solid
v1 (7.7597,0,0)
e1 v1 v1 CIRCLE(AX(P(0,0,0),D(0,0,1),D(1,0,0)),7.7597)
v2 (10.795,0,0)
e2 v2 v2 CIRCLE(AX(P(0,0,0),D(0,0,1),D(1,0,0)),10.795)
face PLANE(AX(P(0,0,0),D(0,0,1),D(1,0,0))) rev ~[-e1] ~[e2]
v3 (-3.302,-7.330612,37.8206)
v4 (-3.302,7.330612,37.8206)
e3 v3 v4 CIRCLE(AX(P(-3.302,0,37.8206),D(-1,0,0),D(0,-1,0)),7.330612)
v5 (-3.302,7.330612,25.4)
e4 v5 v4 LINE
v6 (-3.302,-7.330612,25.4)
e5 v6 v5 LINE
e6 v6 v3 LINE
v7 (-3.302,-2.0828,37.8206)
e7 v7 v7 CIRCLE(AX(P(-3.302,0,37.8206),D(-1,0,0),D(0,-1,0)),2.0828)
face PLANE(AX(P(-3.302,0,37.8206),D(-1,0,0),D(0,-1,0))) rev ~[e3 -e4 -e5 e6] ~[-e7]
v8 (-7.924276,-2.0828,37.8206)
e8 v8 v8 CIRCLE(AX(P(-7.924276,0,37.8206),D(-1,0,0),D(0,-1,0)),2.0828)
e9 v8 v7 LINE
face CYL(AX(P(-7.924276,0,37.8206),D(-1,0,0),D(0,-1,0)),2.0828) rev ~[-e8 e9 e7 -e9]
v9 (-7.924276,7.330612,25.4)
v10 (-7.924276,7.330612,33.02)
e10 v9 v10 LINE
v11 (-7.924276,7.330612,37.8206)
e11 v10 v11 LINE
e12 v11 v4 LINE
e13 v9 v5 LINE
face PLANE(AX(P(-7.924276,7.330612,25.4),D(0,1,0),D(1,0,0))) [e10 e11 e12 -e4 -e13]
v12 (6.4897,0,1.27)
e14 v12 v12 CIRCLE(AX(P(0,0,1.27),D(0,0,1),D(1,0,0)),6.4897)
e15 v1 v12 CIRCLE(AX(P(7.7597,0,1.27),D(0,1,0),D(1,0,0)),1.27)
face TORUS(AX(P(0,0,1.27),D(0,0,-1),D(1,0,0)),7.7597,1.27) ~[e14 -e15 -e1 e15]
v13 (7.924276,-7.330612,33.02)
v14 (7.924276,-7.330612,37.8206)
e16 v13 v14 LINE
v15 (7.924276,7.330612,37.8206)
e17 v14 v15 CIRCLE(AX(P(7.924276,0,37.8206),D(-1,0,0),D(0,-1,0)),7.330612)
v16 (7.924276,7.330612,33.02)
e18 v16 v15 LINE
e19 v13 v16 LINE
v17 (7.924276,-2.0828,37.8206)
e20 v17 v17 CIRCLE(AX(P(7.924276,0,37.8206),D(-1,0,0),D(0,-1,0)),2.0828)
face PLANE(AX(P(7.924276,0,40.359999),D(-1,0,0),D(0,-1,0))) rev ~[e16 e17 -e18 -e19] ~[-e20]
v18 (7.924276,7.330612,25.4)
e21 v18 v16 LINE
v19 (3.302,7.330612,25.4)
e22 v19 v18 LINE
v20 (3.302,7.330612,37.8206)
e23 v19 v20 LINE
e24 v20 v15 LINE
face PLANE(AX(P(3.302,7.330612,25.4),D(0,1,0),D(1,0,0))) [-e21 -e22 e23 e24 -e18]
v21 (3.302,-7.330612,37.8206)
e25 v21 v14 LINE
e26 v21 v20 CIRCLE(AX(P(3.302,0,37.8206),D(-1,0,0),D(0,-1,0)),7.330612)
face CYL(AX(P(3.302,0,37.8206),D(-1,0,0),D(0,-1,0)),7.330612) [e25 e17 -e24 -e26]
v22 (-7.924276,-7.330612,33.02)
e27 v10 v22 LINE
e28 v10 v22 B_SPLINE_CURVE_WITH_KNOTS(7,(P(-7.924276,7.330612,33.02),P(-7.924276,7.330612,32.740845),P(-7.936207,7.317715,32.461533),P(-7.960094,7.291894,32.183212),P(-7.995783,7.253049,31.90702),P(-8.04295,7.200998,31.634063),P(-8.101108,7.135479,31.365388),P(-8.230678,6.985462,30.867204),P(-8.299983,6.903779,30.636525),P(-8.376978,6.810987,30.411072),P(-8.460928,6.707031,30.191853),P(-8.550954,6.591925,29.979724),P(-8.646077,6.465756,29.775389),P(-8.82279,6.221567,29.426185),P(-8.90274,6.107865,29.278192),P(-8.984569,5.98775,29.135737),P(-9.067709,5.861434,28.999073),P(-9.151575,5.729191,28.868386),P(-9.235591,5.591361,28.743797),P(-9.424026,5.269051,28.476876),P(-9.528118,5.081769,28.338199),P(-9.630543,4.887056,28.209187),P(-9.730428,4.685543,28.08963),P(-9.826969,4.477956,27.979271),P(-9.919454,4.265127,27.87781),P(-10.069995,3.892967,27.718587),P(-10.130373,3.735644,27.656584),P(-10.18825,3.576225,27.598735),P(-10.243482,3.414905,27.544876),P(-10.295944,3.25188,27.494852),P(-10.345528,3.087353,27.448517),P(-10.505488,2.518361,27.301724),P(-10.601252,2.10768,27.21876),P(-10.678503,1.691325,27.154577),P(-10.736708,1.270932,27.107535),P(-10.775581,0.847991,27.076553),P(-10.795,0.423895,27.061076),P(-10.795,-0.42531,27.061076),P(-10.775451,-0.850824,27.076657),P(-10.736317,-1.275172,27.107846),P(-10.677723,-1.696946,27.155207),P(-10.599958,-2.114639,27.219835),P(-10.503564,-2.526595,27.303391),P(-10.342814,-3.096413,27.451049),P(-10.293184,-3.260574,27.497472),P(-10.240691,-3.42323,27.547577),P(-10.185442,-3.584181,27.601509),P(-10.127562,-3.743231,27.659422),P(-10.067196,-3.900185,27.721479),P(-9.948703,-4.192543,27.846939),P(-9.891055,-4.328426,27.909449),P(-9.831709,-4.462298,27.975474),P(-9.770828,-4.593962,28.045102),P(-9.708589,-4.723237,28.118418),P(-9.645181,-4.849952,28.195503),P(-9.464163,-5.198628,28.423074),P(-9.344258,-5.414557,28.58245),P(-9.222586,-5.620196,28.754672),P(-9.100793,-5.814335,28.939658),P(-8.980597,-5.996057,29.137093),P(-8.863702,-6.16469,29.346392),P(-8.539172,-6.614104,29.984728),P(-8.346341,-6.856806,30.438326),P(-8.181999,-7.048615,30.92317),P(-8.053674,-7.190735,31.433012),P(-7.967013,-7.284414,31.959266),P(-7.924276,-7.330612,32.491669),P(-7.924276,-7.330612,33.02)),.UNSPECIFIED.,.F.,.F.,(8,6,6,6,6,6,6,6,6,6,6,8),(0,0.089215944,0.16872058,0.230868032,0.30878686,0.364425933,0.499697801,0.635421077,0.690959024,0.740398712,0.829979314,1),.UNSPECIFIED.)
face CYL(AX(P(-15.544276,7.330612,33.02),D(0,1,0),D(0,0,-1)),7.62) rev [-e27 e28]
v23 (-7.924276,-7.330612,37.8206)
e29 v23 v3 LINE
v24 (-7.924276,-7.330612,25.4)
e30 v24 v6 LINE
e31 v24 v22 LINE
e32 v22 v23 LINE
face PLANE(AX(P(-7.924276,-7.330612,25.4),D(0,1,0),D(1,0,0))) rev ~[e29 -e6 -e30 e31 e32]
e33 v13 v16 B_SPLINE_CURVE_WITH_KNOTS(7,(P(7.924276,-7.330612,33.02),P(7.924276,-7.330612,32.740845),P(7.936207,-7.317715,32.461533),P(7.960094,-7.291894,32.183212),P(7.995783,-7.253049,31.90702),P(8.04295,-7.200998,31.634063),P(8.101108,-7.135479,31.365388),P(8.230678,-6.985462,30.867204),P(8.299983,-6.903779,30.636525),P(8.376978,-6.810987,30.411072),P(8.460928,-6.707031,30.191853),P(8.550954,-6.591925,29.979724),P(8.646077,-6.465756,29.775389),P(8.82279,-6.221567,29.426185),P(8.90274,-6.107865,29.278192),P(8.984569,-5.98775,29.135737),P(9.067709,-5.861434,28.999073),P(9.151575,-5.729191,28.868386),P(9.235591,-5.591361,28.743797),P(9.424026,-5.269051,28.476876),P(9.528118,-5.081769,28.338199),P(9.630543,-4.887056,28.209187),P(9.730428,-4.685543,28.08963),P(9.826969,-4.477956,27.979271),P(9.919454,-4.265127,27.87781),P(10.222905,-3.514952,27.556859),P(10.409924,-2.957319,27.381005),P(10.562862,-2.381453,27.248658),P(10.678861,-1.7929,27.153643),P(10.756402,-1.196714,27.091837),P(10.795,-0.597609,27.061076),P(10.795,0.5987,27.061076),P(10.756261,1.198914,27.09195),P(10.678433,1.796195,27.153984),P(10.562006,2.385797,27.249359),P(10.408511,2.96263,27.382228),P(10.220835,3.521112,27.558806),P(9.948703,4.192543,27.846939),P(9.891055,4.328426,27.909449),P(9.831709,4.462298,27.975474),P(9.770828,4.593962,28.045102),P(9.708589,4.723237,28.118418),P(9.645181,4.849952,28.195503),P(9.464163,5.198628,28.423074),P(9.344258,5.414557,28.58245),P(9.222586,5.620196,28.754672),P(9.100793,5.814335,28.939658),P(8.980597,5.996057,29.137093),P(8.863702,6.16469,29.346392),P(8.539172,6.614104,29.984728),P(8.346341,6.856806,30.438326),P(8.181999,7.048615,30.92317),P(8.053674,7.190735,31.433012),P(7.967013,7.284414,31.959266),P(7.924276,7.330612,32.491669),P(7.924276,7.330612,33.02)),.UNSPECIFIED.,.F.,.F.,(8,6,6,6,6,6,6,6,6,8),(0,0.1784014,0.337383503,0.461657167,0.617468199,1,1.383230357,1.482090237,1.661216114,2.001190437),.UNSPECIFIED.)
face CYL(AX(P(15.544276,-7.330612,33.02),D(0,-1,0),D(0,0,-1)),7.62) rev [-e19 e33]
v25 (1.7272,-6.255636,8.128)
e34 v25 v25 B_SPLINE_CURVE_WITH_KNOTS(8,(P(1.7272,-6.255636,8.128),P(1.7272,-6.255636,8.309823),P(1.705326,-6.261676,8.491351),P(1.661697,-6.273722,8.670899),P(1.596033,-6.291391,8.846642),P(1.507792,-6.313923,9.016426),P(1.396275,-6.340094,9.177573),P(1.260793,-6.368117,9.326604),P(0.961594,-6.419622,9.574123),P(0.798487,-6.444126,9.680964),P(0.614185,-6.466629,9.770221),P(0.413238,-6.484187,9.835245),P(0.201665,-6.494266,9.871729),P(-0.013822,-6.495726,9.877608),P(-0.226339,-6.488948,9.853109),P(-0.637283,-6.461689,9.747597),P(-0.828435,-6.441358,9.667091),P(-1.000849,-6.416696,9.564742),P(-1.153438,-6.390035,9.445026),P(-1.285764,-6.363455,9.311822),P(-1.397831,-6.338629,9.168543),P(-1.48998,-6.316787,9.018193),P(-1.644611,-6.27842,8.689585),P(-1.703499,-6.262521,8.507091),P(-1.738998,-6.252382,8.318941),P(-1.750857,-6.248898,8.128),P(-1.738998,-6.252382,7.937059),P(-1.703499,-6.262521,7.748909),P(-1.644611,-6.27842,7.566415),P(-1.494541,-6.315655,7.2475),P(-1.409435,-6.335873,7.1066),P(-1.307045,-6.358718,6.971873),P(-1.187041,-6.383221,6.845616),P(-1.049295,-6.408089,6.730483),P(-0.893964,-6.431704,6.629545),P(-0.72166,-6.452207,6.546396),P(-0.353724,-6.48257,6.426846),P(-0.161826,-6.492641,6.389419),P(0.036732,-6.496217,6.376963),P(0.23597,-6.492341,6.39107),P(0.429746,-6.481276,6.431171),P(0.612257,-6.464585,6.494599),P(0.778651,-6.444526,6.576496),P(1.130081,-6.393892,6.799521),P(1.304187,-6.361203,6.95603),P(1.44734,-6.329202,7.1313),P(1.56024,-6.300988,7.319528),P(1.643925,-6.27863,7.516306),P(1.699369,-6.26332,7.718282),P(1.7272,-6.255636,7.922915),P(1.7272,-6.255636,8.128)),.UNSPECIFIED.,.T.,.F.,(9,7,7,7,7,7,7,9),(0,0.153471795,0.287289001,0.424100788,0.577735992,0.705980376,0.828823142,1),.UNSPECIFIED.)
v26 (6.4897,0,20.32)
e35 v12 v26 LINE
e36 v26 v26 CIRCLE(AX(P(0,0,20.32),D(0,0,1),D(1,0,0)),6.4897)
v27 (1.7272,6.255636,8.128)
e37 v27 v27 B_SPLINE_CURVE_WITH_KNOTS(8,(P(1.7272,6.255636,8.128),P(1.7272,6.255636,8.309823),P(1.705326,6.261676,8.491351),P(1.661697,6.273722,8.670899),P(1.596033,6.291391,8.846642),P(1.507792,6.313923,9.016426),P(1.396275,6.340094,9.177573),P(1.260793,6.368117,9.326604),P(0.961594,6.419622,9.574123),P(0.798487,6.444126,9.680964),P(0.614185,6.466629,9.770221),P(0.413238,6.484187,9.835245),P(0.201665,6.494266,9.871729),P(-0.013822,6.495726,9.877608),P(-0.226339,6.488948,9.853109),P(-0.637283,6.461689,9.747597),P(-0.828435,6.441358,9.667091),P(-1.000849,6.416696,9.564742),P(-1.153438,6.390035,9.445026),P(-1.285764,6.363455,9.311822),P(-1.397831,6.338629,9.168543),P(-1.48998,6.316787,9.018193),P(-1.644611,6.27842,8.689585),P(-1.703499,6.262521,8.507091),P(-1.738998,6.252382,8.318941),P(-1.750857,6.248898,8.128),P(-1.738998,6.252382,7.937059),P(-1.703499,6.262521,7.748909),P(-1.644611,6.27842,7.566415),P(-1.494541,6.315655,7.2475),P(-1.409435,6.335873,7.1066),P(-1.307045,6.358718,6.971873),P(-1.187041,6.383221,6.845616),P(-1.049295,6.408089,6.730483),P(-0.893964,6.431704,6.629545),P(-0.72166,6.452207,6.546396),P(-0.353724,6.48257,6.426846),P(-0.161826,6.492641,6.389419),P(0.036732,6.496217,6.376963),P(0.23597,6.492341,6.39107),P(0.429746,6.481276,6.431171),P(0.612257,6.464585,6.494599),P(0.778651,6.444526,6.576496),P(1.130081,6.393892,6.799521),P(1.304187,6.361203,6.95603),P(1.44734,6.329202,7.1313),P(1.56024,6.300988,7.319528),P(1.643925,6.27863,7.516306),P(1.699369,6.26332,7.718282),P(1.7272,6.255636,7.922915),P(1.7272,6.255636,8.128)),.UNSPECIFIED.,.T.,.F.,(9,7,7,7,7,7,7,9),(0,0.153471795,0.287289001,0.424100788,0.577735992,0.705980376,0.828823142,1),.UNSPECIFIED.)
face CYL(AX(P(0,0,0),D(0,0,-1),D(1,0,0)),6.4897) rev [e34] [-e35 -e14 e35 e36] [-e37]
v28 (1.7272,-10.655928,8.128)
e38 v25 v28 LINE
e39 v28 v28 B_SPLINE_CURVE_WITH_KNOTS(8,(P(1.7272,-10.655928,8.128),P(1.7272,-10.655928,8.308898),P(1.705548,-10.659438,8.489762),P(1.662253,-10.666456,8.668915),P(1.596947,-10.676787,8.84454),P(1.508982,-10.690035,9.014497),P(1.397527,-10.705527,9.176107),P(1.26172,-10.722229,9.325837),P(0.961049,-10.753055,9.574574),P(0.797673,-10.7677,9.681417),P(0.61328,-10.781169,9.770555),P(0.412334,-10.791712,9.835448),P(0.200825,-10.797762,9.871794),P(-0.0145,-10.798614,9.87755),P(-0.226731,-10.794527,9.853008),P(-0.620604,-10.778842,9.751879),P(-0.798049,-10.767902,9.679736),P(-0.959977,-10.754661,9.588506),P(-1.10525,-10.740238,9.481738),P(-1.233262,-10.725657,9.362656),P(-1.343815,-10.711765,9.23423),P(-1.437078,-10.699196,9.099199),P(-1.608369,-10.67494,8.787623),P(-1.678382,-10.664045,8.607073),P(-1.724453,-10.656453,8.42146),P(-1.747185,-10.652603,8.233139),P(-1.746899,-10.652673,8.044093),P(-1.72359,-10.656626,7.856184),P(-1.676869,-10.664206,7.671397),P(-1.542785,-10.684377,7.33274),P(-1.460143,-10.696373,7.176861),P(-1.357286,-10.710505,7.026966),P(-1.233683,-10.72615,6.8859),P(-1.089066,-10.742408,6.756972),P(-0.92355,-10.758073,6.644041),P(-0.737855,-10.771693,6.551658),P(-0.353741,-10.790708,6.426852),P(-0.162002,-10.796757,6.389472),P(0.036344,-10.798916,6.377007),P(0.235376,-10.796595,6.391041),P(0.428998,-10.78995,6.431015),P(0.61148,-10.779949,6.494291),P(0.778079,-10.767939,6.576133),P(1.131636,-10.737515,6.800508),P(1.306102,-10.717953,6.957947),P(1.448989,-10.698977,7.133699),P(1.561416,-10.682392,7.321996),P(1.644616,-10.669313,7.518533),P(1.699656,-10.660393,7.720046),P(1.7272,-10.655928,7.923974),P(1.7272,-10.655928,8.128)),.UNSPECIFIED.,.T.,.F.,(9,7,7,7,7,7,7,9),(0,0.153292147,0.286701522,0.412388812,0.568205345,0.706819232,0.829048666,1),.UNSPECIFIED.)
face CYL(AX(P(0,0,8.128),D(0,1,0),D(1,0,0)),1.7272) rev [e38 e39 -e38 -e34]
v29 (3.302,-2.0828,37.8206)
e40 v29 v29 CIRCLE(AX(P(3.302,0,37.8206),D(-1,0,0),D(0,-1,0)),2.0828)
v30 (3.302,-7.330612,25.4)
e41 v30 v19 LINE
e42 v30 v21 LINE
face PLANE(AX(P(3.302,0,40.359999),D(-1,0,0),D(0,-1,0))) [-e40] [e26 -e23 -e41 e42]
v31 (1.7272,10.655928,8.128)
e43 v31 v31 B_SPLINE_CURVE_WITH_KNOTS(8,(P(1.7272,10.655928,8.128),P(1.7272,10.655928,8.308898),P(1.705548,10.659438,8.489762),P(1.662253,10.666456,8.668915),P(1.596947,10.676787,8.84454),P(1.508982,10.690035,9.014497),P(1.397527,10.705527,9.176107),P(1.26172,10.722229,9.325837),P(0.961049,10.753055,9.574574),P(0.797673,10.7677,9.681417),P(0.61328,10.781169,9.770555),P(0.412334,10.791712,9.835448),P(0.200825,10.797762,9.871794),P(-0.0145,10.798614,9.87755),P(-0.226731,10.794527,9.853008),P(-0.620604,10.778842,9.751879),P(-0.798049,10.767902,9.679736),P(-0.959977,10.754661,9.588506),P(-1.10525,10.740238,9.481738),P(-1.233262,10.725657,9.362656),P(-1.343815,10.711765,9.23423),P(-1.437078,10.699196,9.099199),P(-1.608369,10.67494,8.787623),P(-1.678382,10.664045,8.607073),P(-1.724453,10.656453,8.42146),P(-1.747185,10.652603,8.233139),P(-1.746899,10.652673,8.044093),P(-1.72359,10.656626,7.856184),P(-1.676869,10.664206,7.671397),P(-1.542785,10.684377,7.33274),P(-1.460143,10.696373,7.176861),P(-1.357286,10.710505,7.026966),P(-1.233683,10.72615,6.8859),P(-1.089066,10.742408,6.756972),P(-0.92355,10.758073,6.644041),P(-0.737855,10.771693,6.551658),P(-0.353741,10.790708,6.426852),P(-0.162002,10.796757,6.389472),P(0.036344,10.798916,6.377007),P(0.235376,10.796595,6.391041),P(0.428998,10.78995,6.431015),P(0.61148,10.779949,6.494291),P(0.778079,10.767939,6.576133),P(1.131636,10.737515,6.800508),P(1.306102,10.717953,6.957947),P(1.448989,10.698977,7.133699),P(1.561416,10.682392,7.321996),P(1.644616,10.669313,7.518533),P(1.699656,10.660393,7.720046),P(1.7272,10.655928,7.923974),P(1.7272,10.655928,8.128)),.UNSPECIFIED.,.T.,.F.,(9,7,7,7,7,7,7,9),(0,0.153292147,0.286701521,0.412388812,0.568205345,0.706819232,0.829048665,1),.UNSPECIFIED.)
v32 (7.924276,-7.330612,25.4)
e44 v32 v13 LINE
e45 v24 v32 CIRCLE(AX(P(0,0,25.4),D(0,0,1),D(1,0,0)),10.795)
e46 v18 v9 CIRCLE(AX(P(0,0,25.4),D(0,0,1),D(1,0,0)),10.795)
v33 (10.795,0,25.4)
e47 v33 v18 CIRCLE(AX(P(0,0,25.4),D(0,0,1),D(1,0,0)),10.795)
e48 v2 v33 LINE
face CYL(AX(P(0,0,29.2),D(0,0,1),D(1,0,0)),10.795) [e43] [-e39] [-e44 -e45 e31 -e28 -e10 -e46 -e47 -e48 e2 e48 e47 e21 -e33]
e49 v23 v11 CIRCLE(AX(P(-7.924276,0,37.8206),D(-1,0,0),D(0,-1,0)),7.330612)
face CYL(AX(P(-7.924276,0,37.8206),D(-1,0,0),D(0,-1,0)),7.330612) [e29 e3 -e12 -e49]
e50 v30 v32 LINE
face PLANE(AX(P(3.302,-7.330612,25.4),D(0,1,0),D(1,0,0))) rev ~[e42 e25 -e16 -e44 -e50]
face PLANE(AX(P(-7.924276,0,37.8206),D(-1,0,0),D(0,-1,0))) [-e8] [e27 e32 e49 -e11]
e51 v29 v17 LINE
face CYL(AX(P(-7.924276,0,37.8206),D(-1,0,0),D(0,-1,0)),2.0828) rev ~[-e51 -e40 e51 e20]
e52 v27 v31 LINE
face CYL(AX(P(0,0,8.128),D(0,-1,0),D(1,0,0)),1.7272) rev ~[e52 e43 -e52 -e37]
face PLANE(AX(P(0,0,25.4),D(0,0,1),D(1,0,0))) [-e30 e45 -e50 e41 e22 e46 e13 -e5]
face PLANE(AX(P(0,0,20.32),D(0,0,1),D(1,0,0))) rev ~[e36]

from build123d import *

# Parameters (mm, degrees)
F0_R          = 10.795
F0_R_2        = 6.4897
F1_DEPTH      = 20.32
F2_R          = 10.795
F3_DEPTH      = 5.08
F4_W          = 4.6222759372
F4_H          = 14.661224488
F5_DEPTH      = 12.4206
F6_R          = 1.7272
F7_DEPTH      = 10.796
F7_DEPTH_BACK = 25.4
F9_DEPTH      = 4.6222759372
F10_R         = 7.330612244
F11_DEPTH     = 4.6222759372
F12_R         = 2.0828
F13_DEPTH     = 18.7202760372
F14_T4_DEPTH  = 14.661224488
F14_S5_R      = 10.795
F14_T6_DEPTH  = 11
F14_T10_DEPTH = 14.661224488
F14_S11_R     = 10.795
F14_T12_DEPTH = 11
F15_R         = 1.27


# Not quite as in the source:
# - a fillet or chamfer that OpenCascade refuses, or shapes differently, is made with other operations: its cross-section is extruded or revolved along the edge and cut away or added


with BuildPart() as f1:
    # F0 (on Top) → F1 (new body)
    with BuildSketch(Plane.XY):
        Circle(F0_R)
        Circle(F0_R_2, mode=Mode.SUBTRACT)
    extrude(amount=F1_DEPTH)

    # F2 (on face) → F3 (join)
    with BuildSketch(Plane.XY.offset(20.32)):
        Circle(F2_R)
    extrude(amount=F3_DEPTH)

    # F4 (on face) → F5 (join)
    with BuildSketch(Plane.XY.offset(25.4)):
        with Locations((-5.6131379686, 0)):
            Rectangle(F4_W, F4_H)
        with Locations((5.6131379686, 0)):
            Rectangle(F4_W, F4_H)
    extrude(amount=F5_DEPTH)

    # F6 (on Front) → F7 (cut, two sides)
    with BuildSketch(Plane.XZ) as f7_sk:
        with Locations((0, 8.128)):
            Circle(F6_R)
    extrude(amount=F7_DEPTH, mode=Mode.SUBTRACT)
    extrude(f7_sk.sketch, amount=-F7_DEPTH_BACK, mode=Mode.SUBTRACT)

    # F8 (on face) → F9 (join, through all)
    with BuildSketch(Plane(origin=(3.302, 0, 0), x_dir=(0, -1, 0), z_dir=(-1, 0, 0))):
        with BuildLine():
            Line((-7.330612244, 37.8206), (7.330612244, 37.8206))
            ThreePointArc((7.330612244, 37.8206), (0, 45.151212244), (-7.330612244, 37.8206))
        make_face()
    extrude(amount=-F9_DEPTH)

    # F10 (on face) → F11 (join, through all)
    with BuildSketch(Plane(origin=(-7.9242759372, 0, 0), x_dir=(0, -1, 0), z_dir=(-1, 0, 0))):
        with Locations((0, 37.8206)):
            Circle(F10_R)
    extrude(amount=-F11_DEPTH)

    # F12 (on face) → F13 (cut, through all)
    with BuildSketch(Plane(origin=(-7.9242759372, 0, 0), x_dir=(0, -1, 0), z_dir=(-1, 0, 0))):
        with Locations((0, 37.8206)):
            Circle(F12_R)
    extrude(amount=-F13_DEPTH, mode=Mode.SUBTRACT)

    # F14: fillet of radius 7.62 on 2 edges, made by hand


with BuildPart() as f14_tool2:
    # F14_s3 → F14_t4 (new body)
    with BuildSketch(Plane.XZ.offset(7.330612244)):
        with BuildLine():
            ThreePointArc((15.5442759372, 25.4), (10.1561222645, 27.6318463274), (7.9242759372, 33.02))
            Line((7.9242759372, 33.02), (7.9242759372, 25.4))
            Line((7.9242759372, 25.4), (15.5442759372, 25.4))
        make_face()
    extrude(amount=-F14_T4_DEPTH)

    # F14_s5 → F14_t6 (intersect, symmetric)
    with BuildSketch(Plane.XY.offset(29.2)):
        Circle(F14_S5_R)
    extrude(amount=F14_T6_DEPTH, both=True, mode=Mode.INTERSECT)


with BuildPart() as f1_1:
    add(f1.part)

    # F14_t1: union F14_tool2
    add(f14_tool2.part)


with BuildPart() as f14_tool8:
    # F14_s9 → F14_t10 (new body)
    with BuildSketch(Plane.XZ.offset(-7.330612244)):
        with BuildLine():
            ThreePointArc((-15.5442759372, 25.4), (-10.1561222645, 27.6318463274), (-7.9242759372, 33.02))
            Line((-7.9242759372, 33.02), (-7.9242759372, 25.4))
            Line((-7.9242759372, 25.4), (-15.5442759372, 25.4))
        make_face()
    extrude(amount=F14_T10_DEPTH)

    # F14_s11 → F14_t12 (intersect, symmetric)
    with BuildSketch(Plane.XY.offset(29.2)):
        Circle(F14_S11_R)
    extrude(amount=F14_T12_DEPTH, both=True, mode=Mode.INTERSECT)


with BuildPart() as f1_2:
    add(f1_1.part)

    # F14_t7: union F14_tool8
    add(f14_tool8.part)

    # F15
    f15_edges = [f1_2.edges().sort_by_distance(p)[0] for p in [
        (-6.4897, 0, 0),
    ]]
    fillet(f15_edges, radius=F15_R)


solid = f1_2.part
